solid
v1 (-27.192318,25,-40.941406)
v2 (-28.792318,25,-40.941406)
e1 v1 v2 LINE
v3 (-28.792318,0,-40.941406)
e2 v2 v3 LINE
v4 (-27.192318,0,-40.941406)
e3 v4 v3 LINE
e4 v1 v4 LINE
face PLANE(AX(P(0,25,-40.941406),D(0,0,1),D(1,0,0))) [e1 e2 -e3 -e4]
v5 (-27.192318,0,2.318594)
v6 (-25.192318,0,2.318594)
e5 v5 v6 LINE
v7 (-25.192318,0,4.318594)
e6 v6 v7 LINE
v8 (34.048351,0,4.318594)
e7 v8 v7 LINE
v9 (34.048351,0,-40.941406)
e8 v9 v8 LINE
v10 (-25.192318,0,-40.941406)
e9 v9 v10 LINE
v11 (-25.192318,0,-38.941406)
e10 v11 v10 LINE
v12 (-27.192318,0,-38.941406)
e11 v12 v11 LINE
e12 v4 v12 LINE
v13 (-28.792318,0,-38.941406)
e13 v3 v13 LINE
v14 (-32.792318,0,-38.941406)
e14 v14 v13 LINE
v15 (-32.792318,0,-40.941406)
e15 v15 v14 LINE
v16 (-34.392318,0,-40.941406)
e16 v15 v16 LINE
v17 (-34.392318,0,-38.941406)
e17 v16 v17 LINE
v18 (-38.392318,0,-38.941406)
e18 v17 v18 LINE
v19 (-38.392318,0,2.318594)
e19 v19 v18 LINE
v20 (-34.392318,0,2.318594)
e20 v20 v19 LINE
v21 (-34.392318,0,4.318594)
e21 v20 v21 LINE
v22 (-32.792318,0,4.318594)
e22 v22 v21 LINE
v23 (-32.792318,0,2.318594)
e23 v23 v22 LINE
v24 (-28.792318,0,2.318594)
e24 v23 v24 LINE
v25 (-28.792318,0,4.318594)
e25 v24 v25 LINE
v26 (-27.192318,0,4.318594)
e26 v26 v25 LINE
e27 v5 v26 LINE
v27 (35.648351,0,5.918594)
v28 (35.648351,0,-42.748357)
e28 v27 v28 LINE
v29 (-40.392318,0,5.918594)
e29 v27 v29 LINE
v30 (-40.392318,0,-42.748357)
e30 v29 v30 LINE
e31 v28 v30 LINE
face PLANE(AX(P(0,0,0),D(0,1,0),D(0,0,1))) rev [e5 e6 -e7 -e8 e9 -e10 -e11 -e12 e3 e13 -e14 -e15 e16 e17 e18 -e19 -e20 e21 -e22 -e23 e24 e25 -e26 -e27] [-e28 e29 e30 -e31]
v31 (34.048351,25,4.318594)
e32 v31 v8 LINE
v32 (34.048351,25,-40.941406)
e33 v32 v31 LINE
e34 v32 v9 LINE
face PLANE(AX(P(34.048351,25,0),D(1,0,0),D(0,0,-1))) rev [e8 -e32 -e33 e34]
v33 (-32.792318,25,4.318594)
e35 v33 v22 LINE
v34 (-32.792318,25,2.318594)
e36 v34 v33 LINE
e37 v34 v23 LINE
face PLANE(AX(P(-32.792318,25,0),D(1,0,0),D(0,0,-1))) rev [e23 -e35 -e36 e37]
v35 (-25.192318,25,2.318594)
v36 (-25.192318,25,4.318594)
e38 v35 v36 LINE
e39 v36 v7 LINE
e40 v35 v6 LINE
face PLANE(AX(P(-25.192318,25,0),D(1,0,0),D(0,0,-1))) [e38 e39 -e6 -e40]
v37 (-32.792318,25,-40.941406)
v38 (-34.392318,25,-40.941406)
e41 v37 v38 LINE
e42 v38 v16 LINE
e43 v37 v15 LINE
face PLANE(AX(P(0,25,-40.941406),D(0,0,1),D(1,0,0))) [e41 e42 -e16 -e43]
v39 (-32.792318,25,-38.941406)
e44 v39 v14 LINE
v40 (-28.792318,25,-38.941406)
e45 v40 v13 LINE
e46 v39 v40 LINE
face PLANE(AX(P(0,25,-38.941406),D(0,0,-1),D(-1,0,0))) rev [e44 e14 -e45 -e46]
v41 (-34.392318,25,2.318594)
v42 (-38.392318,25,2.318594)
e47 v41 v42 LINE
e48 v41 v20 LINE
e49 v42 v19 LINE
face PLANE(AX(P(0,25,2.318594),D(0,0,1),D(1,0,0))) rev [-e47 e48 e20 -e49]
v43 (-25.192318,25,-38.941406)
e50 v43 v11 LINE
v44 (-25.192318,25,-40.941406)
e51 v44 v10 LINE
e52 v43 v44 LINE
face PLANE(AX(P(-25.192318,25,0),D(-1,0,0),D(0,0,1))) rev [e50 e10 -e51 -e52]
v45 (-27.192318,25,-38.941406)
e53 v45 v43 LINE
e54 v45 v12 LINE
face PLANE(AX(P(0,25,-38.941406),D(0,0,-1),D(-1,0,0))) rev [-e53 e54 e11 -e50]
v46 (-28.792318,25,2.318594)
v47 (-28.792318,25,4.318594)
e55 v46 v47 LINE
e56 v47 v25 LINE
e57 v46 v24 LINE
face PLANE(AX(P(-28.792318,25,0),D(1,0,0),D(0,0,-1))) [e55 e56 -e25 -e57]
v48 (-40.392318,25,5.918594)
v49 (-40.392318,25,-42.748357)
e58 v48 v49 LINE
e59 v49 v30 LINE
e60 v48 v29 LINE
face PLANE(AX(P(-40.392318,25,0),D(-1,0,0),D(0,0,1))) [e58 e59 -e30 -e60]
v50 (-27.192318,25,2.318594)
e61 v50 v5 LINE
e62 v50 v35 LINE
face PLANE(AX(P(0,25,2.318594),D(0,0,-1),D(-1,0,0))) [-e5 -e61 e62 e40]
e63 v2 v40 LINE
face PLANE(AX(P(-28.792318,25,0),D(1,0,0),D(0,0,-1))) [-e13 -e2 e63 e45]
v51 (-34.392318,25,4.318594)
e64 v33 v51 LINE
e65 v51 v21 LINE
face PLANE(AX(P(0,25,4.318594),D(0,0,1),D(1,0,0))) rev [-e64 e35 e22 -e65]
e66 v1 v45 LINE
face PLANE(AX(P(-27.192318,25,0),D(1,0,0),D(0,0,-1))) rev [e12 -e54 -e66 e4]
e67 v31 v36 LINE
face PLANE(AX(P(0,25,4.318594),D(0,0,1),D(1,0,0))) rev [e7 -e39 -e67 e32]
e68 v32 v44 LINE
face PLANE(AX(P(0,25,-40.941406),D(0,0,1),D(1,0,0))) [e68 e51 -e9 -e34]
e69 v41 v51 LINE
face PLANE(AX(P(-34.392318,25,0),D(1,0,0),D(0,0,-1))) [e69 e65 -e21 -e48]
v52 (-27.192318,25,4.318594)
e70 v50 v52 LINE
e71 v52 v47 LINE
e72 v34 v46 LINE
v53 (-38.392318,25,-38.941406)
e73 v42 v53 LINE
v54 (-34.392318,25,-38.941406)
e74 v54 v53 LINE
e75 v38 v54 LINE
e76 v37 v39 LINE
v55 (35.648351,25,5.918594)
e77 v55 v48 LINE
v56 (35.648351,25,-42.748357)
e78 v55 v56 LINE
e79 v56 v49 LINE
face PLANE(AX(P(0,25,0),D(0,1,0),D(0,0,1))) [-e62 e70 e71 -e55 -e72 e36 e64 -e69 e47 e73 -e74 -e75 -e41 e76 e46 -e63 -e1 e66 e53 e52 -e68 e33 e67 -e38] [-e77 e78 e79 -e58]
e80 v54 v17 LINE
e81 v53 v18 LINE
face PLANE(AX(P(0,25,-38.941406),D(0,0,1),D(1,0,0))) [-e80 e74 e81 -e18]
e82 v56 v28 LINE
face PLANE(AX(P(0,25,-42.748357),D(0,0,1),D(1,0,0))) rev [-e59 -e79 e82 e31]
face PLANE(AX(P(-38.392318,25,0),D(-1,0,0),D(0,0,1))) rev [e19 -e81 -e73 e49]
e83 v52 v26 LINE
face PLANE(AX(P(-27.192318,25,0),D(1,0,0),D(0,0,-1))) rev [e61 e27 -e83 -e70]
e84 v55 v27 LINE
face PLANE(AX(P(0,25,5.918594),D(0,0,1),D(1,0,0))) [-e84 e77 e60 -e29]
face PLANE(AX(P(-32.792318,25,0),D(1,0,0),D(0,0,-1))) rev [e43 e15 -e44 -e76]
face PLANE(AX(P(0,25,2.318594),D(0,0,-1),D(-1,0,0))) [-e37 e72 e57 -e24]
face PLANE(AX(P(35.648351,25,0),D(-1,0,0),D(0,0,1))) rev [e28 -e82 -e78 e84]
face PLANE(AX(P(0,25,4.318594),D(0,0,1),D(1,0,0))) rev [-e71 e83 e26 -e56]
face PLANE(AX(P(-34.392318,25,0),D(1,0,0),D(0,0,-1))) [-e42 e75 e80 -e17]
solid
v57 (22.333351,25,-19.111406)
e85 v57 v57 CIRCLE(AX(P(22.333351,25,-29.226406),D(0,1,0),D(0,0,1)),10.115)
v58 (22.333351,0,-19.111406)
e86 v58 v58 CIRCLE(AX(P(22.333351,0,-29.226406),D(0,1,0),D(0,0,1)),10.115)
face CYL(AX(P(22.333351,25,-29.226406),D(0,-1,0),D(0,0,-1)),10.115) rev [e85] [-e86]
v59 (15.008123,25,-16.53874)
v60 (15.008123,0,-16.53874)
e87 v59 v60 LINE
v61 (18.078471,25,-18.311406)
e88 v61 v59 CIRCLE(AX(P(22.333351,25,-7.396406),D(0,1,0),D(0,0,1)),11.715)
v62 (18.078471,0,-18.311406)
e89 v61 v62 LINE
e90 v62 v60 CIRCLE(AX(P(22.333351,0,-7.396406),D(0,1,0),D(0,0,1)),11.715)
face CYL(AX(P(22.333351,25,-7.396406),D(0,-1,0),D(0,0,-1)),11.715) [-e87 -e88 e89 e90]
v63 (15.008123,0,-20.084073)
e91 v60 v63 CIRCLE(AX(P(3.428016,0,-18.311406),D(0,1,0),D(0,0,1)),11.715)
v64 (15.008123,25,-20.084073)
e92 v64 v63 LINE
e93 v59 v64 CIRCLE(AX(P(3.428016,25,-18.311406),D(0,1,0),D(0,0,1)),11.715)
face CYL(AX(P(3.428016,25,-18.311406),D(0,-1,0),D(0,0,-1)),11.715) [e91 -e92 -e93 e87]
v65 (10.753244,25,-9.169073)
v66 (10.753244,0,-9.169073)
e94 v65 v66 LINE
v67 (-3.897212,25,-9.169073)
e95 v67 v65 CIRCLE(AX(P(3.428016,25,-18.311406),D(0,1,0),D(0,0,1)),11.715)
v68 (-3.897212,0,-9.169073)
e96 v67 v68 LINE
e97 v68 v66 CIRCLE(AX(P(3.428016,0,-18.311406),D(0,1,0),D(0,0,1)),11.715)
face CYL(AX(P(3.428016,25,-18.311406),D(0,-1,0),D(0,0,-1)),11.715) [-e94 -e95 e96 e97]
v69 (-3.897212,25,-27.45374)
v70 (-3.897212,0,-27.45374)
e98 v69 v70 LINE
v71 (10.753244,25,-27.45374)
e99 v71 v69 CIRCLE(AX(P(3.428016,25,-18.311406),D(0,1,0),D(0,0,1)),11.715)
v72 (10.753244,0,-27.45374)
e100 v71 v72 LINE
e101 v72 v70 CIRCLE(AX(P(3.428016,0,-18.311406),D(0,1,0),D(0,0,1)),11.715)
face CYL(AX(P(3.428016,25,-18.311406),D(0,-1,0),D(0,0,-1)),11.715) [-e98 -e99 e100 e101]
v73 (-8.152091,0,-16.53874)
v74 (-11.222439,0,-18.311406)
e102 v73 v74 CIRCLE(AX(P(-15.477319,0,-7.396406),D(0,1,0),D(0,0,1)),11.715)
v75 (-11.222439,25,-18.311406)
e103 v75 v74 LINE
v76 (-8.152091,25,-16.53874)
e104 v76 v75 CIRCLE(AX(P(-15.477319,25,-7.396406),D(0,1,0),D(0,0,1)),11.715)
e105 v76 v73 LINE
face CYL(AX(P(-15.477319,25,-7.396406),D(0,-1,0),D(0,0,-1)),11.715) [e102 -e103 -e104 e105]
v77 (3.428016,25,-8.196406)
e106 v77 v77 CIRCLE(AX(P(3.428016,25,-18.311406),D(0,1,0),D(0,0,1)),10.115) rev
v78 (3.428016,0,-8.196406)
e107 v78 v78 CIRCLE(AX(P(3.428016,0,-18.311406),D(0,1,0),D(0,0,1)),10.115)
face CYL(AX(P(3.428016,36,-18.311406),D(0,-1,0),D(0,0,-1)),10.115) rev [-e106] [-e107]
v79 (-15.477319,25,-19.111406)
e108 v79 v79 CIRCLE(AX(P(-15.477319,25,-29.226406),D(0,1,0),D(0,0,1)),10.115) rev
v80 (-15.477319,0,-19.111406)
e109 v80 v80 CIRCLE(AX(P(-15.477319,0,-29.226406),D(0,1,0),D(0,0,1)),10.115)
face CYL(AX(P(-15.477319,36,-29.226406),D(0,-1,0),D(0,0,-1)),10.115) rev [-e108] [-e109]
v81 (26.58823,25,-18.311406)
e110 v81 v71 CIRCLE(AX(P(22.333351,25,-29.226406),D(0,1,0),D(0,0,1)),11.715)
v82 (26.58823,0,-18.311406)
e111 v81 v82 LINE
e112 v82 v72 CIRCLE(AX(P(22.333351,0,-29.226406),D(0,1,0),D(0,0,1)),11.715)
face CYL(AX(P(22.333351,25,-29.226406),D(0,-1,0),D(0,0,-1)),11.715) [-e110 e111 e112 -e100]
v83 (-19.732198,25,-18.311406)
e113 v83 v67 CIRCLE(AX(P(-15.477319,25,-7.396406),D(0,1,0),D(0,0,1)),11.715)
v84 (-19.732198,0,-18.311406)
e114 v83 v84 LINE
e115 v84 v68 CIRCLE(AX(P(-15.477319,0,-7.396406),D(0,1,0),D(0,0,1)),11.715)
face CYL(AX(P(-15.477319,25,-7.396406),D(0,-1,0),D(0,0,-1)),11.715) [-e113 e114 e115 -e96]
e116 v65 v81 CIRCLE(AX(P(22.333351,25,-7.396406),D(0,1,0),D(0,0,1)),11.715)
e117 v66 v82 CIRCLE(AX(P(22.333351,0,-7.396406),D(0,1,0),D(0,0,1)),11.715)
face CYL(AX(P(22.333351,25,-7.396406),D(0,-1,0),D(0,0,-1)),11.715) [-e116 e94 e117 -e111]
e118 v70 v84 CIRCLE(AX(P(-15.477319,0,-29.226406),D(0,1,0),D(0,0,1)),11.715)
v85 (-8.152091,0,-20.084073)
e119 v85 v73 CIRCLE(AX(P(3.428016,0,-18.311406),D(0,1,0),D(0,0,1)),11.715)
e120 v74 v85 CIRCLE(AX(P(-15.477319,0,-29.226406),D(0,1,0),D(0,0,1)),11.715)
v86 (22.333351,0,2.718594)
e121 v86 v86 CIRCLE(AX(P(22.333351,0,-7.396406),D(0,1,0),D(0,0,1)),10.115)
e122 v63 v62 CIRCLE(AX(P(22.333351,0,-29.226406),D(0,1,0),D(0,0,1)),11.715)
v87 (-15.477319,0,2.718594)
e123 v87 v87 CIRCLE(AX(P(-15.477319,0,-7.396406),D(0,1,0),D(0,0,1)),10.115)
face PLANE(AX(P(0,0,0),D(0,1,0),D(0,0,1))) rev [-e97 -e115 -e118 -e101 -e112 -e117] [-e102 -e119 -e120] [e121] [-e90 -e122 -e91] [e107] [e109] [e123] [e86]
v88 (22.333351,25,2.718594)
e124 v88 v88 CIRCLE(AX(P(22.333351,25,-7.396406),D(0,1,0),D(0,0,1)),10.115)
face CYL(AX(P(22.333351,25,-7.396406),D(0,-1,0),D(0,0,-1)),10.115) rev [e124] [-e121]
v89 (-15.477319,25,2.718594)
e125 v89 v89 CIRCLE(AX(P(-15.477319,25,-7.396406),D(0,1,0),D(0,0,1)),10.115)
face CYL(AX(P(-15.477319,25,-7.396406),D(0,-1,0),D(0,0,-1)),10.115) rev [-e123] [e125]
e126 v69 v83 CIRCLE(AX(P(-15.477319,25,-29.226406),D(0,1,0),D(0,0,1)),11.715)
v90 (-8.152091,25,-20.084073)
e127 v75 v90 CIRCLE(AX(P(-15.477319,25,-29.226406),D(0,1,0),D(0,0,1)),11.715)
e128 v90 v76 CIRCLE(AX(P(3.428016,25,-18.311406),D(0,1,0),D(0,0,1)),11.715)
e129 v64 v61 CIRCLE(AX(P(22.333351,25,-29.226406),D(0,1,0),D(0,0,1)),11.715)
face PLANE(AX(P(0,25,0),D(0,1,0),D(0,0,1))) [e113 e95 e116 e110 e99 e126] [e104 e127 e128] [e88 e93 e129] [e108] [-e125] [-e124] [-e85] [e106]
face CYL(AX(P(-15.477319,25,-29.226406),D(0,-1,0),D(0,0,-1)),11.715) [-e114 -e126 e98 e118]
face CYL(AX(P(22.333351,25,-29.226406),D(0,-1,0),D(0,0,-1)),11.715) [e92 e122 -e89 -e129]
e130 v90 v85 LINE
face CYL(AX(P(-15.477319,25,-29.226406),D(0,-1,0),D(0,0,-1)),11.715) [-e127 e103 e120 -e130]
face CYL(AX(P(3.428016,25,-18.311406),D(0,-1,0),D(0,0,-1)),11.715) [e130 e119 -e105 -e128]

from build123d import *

# Parameters (mm, degrees)
SKETCH1_R             = 10.115000047
BOSS_EXTRUDE4_DEPTH   = 25
SKETCH1_W             = 76.040669035
SKETCH1_H             = 48.666950676
BOSS_EXTRUDE4_2_DEPTH = 25
SKETCH1_9_R           = 10.115000047
CUT_EXTRUDE1_DEPTH    = 36


with BuildPart() as part:
    # Sketch1 → Boss-Extrude4 (new body)
    with BuildSketch(Plane(origin=(0, 0, 0), x_dir=(1, 0, 0), z_dir=(0, 1, 0))):
        with BuildLine():
            ThreePointArc((22.33335059, 40.941406253), (13.444930876, 36.857737704), (10.753243591, 27.45373997))
            ThreePointArc((10.753243591, 27.45373997), (3.42801602, 30.026406253), (-3.897211552, 27.45373997))
            ThreePointArc((-3.897211552, 27.45373997), (-6.588898838, 36.857737705), (-15.477318554, 40.941406253))
            ThreePointArc((-15.477318554, 40.941406253), (-26.990581515, 31.391123299), (-19.732197967, 18.3114063))
            ThreePointArc((-19.732197967, 18.3114063), (-26.990581514, 5.231689296), (-15.477318545, -4.318593653))
            ThreePointArc((-15.477318545, -4.318593653), (-6.588898835, -0.234925102), (-3.897211552, 9.16907263))
            ThreePointArc((-3.897211552, 9.16907263), (3.42801602, 6.596406347), (10.753243591, 9.16907263))
            ThreePointArc((10.753243591, 9.16907263), (13.444930875, -0.234925102), (22.333350586, -4.318593653))
            ThreePointArc((22.333350586, -4.318593653), (30.617106493, -0.887349608), (34.048350537, 7.3964063))
            ThreePointArc((34.048350537, 7.3964063), (32.005142976, 14.006826546), (26.588230006, 18.3114063))
            ThreePointArc((26.588230006, 18.3114063), (32.005142976, 22.615986054), (34.048350537, 29.2264063))
            ThreePointArc((34.048350537, 29.2264063), (30.617106494, 37.510162206), (22.33335059, 40.941406253))
        make_face()
        with Locations((22.333350584, 29.2264063)):
            Circle(SKETCH1_R, mode=Mode.SUBTRACT)
        with BuildLine():
            ThreePointArc((15.008123013, 20.08407263), (16.475850608, 19.080918735), (18.078471162, 18.3114063))
            ThreePointArc((18.078471162, 18.3114063), (16.475850608, 17.541893865), (15.008123013, 16.53873997))
            ThreePointArc((15.008123013, 16.53873997), (15.143015973, 18.3114063), (15.008123013, 20.08407263))
        make_face(mode=Mode.SUBTRACT)
        with Locations((22.333350584, 7.3964063)):
            Circle(SKETCH1_R, mode=Mode.SUBTRACT)
        with BuildLine():
            ThreePointArc((-8.152090974, 16.53873997), (-9.619818569, 17.541893865), (-11.222439123, 18.3114063))
            ThreePointArc((-11.222439123, 18.3114063), (-9.619818569, 19.080918735), (-8.152090974, 20.08407263))
            ThreePointArc((-8.152090974, 20.08407263), (-8.286983933, 18.3114063), (-8.152090974, 16.53873997))
        make_face(mode=Mode.SUBTRACT)
        with Locations((-15.477318545, 7.3964063)):
            Circle(SKETCH1_R, mode=Mode.SUBTRACT)
    extrude(amount=BOSS_EXTRUDE4_DEPTH)

    # Sketch1<9> → Cut-Extrude1 (cut)
    with BuildSketch(Plane(origin=(0, 0, 0), x_dir=(1, 0, 0), z_dir=(0, 1, 0))):
        with Locations((3.42801602, 18.3114063)):
            Circle(SKETCH1_9_R)
        with Locations((-15.477318545, 29.2264063)):
            Circle(SKETCH1_9_R)
    extrude(amount=CUT_EXTRUDE1_DEPTH, mode=Mode.SUBTRACT)


with BuildPart() as body_2:
    # Sketch1 → Boss-Extrude4 2 (new body)
    with BuildSketch(Plane(origin=(0, 0, 0), x_dir=(1, 0, 0), z_dir=(0, 1, 0))):
        with Locations((-2.371983981, 18.414881685)):
            Rectangle(SKETCH1_W, SKETCH1_H)
        Polygon((-25.192318498, 38.941406253), (-25.192318498, 40.941406253), (-15.477318554, 40.941406253), (22.33335059, 40.941406253), (34.048350537, 40.941406253), (34.048350537, 29.2264063), (34.048350537, 7.3964063), (34.048350537, -4.318593653), (22.333350586, -4.318593653), (-15.477318545, -4.318593653), (-25.192318498, -4.318593653), (-25.192318498, -2.318593653), (-27.192318498, -2.318593653), (-27.192318498, -4.318593653), (-28.792318498, -4.318593653), (-28.792318498, -2.318593653), (-32.792318498, -2.318593653), (-32.792318498, -4.318593653), (-34.392318498, -4.318593653), (-34.392318498, -2.318593653), (-38.392318498, -2.318593653), (-38.392318498, 38.941406253), (-34.392318498, 38.941406253), (-34.392318498, 40.941406253), (-32.792318498, 40.941406253), (-32.792318498, 38.941406253), (-28.792318498, 38.941406253), (-28.792318498, 40.941406253), (-27.192318498, 40.941406253), (-27.192318498, 38.941406253), align=None, mode=Mode.SUBTRACT)
    extrude(amount=BOSS_EXTRUDE4_2_DEPTH)


solid = Compound([part.part, body_2.part])
